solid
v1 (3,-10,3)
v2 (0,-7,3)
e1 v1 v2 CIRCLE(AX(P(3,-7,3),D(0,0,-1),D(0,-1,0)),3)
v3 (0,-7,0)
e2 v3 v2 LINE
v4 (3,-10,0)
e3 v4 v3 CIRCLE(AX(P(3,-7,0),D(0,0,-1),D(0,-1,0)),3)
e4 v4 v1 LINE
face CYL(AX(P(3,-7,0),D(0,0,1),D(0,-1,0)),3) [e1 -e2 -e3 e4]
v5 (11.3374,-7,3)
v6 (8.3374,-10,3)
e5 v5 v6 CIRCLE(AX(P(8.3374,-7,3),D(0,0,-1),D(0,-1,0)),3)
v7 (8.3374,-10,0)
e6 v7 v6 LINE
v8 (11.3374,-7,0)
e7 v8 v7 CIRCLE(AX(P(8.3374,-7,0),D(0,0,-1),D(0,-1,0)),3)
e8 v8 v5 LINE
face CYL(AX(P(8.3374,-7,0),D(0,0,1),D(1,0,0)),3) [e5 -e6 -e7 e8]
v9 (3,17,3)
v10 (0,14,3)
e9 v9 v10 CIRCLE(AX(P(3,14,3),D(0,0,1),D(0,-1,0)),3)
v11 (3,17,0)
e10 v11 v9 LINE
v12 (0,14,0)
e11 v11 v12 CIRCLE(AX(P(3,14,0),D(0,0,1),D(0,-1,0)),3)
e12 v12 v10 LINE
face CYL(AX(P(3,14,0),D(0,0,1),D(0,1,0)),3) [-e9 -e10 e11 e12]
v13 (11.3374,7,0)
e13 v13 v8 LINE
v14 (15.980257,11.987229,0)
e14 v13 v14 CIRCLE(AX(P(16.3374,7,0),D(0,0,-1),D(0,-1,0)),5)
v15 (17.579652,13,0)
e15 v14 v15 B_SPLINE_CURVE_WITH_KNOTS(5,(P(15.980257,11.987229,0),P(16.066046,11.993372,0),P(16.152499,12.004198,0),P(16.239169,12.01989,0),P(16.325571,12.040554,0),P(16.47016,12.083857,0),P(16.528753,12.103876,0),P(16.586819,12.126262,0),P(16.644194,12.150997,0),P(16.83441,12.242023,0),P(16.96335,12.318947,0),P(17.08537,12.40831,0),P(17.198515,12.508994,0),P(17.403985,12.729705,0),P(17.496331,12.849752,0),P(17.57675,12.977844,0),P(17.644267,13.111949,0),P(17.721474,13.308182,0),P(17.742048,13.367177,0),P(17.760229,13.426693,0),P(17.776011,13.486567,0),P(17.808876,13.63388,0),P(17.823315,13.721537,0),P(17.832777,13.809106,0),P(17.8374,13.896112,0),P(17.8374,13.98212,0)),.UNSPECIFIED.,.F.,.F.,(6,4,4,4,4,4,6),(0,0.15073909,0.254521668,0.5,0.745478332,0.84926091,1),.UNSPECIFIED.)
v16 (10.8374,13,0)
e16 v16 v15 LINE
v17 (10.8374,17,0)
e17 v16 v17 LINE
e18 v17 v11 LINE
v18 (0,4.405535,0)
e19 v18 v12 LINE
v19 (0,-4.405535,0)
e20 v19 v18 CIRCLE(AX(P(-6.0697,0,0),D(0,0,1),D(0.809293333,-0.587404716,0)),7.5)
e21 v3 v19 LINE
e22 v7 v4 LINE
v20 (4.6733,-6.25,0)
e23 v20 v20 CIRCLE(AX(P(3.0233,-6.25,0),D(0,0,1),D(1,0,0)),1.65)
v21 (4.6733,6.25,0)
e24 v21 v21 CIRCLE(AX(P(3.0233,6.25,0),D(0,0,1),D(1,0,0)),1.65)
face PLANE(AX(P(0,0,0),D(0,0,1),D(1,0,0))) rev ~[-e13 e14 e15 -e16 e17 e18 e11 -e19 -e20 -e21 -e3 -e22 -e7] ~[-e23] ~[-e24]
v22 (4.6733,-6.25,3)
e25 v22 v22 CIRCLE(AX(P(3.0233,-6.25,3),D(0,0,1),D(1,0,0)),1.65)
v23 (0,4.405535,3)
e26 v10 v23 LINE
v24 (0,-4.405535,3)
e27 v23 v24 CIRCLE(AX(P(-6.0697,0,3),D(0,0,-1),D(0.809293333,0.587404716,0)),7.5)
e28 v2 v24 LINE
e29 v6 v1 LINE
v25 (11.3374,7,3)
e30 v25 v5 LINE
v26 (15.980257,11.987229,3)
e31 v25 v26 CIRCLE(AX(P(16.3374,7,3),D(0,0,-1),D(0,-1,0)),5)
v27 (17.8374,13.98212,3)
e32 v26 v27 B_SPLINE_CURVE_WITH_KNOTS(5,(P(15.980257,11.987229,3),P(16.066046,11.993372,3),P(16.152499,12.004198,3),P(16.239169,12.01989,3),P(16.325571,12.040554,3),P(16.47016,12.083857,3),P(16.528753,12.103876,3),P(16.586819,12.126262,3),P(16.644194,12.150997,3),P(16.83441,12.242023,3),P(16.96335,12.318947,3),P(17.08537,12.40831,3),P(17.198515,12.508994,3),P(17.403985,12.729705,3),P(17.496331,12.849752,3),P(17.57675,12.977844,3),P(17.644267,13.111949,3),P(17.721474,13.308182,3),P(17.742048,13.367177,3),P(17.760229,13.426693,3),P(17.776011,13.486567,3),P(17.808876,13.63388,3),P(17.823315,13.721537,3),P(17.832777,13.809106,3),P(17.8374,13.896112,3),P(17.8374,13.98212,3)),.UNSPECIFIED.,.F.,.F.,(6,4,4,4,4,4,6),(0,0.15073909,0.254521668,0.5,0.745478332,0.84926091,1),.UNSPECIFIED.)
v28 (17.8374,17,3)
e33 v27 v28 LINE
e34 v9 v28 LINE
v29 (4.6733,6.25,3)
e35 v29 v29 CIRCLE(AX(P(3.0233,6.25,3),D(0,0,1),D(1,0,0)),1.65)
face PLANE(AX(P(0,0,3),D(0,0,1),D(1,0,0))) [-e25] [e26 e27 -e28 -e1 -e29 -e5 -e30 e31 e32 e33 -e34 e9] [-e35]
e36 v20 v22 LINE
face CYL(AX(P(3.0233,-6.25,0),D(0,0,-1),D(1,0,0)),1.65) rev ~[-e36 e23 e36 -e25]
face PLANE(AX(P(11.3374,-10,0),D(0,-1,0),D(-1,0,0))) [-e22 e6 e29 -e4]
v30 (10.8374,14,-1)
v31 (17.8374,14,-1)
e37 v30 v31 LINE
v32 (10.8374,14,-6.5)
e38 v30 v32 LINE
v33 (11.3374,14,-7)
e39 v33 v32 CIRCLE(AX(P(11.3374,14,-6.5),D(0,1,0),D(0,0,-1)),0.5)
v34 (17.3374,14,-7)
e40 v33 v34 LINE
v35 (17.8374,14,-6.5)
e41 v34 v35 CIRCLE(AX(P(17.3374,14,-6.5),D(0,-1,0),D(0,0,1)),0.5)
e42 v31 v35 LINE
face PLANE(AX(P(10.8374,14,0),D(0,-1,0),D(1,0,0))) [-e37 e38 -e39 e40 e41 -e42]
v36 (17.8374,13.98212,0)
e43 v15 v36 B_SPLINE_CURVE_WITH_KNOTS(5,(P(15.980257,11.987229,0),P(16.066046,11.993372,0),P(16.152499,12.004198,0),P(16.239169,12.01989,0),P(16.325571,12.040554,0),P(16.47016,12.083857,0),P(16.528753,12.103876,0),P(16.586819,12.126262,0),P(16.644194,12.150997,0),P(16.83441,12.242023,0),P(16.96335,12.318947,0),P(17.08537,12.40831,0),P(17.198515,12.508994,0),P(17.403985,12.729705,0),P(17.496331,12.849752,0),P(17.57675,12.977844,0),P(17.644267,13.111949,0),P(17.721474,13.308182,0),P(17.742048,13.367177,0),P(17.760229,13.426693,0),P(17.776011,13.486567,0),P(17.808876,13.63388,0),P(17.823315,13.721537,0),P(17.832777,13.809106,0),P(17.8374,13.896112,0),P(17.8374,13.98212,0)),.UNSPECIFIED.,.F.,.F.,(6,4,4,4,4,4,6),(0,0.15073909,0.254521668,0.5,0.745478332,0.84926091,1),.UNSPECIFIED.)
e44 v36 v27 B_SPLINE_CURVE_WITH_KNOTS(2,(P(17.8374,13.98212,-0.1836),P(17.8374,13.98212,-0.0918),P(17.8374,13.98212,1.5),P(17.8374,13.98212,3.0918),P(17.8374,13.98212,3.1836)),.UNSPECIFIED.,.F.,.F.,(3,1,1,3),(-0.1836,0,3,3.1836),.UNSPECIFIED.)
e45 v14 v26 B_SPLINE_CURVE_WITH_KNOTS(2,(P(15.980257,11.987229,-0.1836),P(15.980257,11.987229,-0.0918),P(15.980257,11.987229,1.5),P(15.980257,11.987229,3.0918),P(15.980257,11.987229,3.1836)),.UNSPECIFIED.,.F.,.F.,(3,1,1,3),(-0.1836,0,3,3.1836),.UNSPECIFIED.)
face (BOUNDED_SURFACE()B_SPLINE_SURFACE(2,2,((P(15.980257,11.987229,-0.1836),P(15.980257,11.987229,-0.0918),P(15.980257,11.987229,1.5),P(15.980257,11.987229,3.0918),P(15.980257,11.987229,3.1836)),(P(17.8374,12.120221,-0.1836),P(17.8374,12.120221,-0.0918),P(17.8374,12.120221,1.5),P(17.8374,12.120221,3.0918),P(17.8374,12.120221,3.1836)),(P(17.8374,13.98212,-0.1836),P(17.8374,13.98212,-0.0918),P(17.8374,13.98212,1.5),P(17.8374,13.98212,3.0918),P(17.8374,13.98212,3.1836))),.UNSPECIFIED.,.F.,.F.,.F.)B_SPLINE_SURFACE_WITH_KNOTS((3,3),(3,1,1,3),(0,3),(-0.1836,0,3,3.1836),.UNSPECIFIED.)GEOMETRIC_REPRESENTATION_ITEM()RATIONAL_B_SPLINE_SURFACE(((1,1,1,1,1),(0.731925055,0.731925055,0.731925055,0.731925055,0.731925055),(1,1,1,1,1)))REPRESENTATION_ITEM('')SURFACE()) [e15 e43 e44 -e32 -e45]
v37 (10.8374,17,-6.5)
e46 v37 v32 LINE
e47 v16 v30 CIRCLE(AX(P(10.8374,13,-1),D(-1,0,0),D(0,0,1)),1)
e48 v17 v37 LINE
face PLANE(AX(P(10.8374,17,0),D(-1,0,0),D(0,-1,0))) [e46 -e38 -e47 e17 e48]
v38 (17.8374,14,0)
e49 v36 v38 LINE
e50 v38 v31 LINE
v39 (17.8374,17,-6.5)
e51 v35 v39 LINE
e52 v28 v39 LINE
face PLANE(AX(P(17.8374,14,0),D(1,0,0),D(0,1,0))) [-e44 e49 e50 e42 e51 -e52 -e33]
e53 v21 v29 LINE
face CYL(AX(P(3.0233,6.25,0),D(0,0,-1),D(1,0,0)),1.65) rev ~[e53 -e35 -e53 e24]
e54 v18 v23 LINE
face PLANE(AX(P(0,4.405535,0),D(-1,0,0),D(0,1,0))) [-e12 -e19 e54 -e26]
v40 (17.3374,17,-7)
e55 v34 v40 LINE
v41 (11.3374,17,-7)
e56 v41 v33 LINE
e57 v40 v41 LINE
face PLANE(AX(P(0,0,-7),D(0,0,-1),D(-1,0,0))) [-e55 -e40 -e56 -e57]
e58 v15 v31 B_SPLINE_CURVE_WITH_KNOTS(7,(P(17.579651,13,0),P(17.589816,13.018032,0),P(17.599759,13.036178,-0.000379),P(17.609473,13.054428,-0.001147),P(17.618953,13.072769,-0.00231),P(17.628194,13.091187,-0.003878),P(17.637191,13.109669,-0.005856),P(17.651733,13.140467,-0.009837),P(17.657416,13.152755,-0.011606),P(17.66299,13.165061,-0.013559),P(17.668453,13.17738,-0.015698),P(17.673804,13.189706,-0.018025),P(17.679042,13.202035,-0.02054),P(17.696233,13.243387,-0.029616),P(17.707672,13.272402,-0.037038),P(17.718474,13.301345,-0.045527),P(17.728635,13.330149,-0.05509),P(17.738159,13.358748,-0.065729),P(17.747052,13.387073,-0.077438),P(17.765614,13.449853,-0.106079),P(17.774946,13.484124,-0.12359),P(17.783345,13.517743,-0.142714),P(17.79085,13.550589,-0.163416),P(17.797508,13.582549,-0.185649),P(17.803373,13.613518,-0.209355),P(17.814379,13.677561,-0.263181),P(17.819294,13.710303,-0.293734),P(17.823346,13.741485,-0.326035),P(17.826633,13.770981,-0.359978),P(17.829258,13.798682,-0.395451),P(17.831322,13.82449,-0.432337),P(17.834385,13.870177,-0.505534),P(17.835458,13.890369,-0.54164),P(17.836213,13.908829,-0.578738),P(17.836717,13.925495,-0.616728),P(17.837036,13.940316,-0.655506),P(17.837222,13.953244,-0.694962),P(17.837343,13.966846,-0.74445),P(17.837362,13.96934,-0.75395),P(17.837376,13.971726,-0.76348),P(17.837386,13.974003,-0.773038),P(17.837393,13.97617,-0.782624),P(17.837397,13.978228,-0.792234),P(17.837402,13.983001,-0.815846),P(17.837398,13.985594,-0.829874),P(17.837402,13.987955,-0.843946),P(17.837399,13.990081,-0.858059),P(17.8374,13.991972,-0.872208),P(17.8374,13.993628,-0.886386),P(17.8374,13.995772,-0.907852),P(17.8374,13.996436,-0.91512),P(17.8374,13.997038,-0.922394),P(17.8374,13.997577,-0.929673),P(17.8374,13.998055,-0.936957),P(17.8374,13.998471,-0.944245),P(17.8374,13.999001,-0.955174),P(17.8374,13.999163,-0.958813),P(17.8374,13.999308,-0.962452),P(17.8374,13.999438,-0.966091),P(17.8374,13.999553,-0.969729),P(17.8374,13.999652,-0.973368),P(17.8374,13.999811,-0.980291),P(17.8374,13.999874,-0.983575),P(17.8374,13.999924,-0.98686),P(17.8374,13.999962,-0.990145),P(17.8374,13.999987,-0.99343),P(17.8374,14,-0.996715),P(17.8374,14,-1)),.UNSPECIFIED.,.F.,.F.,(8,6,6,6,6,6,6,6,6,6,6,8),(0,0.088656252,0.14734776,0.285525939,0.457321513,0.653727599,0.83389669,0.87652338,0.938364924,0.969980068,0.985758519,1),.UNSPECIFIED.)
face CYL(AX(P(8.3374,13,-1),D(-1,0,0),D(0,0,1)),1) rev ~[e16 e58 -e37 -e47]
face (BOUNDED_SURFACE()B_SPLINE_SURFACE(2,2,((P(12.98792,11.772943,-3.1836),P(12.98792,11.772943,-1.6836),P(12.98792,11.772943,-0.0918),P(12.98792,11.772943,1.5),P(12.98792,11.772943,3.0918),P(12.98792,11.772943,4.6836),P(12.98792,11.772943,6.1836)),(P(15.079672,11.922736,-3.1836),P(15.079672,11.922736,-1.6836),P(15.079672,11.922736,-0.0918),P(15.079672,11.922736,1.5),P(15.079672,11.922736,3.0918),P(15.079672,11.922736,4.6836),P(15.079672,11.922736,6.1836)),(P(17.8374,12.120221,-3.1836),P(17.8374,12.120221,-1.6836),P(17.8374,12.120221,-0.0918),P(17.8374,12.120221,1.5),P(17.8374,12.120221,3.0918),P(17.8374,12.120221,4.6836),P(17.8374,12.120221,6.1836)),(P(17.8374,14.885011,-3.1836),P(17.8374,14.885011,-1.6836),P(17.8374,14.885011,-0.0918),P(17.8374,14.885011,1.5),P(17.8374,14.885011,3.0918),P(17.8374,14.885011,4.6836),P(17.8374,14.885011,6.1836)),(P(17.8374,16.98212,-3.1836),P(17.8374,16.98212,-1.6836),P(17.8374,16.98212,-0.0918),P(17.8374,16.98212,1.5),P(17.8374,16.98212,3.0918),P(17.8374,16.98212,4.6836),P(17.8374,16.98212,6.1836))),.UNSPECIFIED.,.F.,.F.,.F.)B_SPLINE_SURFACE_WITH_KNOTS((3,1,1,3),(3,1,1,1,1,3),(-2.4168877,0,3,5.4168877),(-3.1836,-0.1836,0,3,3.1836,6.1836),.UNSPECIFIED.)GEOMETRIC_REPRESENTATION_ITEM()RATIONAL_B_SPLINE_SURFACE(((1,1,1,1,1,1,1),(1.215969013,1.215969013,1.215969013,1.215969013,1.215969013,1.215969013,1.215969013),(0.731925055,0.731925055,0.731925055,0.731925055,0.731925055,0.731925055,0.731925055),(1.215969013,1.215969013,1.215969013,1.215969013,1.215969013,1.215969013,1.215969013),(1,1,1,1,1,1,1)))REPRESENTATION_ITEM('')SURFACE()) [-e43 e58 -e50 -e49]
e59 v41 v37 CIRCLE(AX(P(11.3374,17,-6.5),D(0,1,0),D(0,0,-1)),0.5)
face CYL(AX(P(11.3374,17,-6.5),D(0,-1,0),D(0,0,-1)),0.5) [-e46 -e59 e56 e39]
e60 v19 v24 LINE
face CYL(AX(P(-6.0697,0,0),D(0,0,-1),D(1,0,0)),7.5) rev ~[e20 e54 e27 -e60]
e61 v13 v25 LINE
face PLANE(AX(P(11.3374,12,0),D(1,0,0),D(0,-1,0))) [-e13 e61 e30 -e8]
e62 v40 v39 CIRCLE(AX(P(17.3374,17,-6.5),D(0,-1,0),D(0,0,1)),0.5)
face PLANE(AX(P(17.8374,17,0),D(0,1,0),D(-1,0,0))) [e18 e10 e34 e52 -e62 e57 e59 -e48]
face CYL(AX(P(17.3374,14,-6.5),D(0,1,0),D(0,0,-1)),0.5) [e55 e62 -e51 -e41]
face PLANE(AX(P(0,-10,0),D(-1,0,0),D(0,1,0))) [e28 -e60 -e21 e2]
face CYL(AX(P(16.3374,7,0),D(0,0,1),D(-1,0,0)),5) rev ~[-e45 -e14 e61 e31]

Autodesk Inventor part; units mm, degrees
ref_plane "YZ Plane" through (0, 0, 0) normal (1, 0, 0) x (0, 1, 0)
ref_plane "XZ Plane" through (0, 0, 0) normal (0, 1, 0) x (-1, 0, 0)
ref_plane "XY Plane" through (0, 0, 0) normal (0, 0, 1) x (1, 0, 0)
sketch "Sketch1" plane through (0, 0, 0) normal (0, 0, 1) x (1, 0, 0)
  line L0 (0, 12) -> (11.3374, 12)
  line L1 (11.3374, 12) -> (11.3374, -10)
  line L2 (11.3374, -10) -> (0, -10)
  line L3 (0, -10) -> (0, 12)
  line L4 (3.0233, 0) -> (3.0233, 6.25) construction
  circle A0 centre (3.0233, 6.25) radius 1.65
  line L5 (3.0233, 0) -> (0, 0) construction
  circle A1 centre (3.0233, -6.25) radius 1.65
  circle A2 centre (-6.0697, 0) radius 7.5
  point P0 (0, 4.4056)
  point P1 (0, -4.4056)
  dimension "d0" = 3.3
  dimension "d1" = 6.25
  dimension "d2" = 11.3375
  dimension "d3" = 9.093
  dimension "d4" = 15
  dimension "d8" = 12
  dimension "d9" = 10
extrude "Extrusion1" add sketch "Sketch1" along normal blind 3 contours L0 L1 L2 L3 A2
sketch "Sketch2" plane through (0, 0, 0) normal (0, 0, -1) x (-1, 0, 0)
  line L0 (-11.3374, 12) -> (0, 12) projected
  line L1 (0, 12) -> (-17.8374, 12)
  line L2 (-17.8374, 12) -> (-17.8374, 17)
  line L3 (-17.8374, 17) -> (0, 17)
  line L4 (0, 17) -> (0, 12)
  line L5 (-11.3374, -10) -> (-11.3374, 12) projected
  point P0 (0, 0)
  dimension "d10" = 6.5
  dimension "d11" = 5
extrude "Extrusion2" add sketch "Sketch2" against normal blind 3
sketch "Sketch3" plane through (0, 0, 0) normal (0, 0, -1) x (-1, 0, 0)
  line L0 (-17.8374, 17) -> (0, 17) projected
  line L1 (-17.8374, 17) -> (-10.8374, 17)
  line L2 (-10.8374, 17) -> (-10.8374, 14)
  line L3 (-10.8374, 14) -> (-17.8374, 14)
  line L4 (-17.8374, 14) -> (-17.8374, 17)
  point P0 (0, 0)
  dimension "d14" = 3
  dimension "d15" = 7
extrude "Extrusion3" add sketch "Sketch3" along normal blind 7
fillet "Fillet1" radius 3 3 edges at (11.3374, -10, 1.5) (0, -10, 1.5) (0, 17, 1.5)
fillet "Fillet2" radius 5 1 edges at (11.3374, 12, 1.5)
fillet "Fillet3" radius 2 1 edges at (17.8374, 12, 1.5)
fillet "Fillet4" radius 1 1 edges at (14.3374, 14, 0)
fillet "Fillet5" radius 0.5 2 edges at (17.8374, 15.5, -7) (10.8374, 15.5, -7)
properties part number "Beam breaker"
